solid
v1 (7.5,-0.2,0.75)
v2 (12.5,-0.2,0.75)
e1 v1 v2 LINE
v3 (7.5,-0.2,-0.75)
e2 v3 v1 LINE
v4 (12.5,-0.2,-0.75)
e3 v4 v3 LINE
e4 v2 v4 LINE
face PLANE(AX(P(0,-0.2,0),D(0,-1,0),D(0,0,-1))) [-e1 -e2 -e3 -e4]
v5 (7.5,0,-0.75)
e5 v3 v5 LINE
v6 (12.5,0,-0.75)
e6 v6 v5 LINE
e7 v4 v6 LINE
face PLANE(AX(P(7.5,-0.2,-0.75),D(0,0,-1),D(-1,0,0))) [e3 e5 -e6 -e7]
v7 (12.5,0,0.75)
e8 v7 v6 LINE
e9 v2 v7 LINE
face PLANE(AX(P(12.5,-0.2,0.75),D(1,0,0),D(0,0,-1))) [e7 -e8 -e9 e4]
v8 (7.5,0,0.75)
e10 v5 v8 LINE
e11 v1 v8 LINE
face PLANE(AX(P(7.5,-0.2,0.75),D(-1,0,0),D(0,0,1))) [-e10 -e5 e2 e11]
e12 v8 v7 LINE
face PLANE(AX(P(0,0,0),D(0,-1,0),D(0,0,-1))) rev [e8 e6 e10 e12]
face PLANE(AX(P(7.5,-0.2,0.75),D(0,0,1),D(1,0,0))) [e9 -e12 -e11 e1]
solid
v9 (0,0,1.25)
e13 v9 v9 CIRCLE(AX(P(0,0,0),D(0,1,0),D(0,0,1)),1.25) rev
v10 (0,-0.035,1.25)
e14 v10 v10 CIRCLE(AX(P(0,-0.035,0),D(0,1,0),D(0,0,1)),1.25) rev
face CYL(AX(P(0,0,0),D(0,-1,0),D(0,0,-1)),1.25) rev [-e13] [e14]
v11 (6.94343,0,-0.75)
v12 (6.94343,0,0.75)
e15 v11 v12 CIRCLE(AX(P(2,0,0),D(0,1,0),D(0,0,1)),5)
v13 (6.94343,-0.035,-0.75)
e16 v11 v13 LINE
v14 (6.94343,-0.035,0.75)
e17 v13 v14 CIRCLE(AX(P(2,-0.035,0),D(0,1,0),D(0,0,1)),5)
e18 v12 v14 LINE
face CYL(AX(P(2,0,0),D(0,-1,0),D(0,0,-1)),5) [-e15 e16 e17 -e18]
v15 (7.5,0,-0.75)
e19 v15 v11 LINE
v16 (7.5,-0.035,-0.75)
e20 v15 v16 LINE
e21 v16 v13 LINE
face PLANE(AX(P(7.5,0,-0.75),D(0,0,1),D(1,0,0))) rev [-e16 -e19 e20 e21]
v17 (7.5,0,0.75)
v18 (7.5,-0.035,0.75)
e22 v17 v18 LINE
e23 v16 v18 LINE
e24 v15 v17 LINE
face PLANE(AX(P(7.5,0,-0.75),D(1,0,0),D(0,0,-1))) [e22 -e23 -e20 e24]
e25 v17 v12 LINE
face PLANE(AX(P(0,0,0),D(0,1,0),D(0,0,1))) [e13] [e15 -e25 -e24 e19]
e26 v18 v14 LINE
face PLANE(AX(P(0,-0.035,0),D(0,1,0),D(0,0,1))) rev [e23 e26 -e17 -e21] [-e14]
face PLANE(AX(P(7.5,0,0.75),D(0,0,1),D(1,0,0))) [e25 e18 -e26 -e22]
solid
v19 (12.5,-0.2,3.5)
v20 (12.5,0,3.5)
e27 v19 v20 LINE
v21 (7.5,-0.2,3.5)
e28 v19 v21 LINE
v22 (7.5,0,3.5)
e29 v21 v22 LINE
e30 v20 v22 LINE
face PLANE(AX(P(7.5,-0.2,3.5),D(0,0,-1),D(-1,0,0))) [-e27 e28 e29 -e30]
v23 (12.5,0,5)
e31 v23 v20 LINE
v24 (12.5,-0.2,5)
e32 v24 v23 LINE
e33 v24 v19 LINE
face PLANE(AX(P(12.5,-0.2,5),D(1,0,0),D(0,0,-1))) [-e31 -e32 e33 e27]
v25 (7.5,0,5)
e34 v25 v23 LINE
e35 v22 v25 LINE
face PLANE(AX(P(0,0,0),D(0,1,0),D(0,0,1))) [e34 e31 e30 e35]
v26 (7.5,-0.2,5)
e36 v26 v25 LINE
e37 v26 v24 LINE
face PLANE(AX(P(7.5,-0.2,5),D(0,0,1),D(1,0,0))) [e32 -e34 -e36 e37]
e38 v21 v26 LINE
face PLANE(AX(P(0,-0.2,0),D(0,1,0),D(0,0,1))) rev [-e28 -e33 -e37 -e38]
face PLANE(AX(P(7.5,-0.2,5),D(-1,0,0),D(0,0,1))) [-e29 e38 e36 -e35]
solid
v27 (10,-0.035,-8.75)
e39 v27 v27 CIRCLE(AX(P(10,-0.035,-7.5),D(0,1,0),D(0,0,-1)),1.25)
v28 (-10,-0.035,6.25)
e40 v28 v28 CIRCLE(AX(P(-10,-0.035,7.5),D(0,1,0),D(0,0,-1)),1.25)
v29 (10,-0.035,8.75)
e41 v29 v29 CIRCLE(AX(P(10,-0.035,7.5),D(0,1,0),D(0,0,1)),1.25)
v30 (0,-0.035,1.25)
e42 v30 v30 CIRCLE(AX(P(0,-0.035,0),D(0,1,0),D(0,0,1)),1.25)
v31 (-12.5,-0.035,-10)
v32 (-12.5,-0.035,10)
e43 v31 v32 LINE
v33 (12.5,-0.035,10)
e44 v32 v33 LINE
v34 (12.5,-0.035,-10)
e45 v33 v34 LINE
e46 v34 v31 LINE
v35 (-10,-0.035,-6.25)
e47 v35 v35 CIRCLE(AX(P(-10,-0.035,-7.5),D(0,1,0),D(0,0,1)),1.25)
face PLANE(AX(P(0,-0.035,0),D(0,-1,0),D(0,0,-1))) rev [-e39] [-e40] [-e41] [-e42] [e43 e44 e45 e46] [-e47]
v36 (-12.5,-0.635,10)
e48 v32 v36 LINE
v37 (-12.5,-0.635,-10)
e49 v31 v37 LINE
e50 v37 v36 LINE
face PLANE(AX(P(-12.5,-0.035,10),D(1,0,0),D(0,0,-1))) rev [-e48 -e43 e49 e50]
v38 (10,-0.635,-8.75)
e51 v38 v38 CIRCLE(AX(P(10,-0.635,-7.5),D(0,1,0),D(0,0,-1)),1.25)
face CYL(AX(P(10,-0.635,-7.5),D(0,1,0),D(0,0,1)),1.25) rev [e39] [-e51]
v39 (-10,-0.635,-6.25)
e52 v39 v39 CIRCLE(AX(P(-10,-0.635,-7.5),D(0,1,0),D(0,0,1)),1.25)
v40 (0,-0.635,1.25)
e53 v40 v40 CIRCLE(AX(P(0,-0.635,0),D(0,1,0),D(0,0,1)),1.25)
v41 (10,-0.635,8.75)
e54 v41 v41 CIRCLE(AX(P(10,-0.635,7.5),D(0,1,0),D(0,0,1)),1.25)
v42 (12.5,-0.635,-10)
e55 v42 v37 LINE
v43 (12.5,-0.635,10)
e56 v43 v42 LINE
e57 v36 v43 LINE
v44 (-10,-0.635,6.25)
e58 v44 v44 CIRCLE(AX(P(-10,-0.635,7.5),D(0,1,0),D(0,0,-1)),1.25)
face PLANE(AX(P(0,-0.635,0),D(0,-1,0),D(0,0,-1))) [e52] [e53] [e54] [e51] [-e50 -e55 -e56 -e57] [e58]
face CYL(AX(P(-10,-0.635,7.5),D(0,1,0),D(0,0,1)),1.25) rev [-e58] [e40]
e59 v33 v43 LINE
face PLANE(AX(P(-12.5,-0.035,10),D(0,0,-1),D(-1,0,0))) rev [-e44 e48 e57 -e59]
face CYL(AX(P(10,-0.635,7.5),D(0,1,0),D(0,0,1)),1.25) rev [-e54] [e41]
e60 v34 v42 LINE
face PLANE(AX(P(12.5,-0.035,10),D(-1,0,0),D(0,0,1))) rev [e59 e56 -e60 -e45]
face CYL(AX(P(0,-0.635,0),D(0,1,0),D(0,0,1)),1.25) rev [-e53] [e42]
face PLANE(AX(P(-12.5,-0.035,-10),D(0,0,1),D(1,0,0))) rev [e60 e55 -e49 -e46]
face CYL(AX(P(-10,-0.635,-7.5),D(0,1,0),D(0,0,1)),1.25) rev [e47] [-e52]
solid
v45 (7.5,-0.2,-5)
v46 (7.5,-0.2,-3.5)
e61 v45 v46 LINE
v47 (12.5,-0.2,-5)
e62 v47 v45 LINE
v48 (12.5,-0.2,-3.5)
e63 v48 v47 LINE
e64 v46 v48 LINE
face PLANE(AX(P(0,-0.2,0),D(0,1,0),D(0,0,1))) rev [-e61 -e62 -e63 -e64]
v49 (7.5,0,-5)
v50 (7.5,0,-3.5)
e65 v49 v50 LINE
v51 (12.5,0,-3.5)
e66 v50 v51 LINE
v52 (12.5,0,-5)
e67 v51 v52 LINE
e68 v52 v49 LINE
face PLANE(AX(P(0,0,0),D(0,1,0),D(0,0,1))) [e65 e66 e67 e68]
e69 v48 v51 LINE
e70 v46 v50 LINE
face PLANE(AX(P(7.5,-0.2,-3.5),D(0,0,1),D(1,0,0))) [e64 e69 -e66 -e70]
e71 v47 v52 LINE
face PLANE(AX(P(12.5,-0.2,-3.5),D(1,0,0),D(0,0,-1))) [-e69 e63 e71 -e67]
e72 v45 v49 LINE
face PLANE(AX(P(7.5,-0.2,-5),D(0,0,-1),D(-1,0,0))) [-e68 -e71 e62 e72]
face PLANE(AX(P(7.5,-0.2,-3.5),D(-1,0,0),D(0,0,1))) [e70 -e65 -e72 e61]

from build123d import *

# Parameters (mm, degrees)
BOSS_EXTRUDE1_START   = -0.635
SKETCH1_W             = 25
SKETCH1_H             = 20
BOSS_EXTRUDE1_DEPTH   = 0.6
SKETCH2_R             = 1.25
CUT_EXTRUDE1_DEPTH    = 0.6
BOSS_EXTRUDE2_START   = 0.035
SKETCH9_W             = 5
SKETCH9_H             = 1.5
BOSS_EXTRUDE2_DEPTH   = 0.2
BOSS_EXTRUDE2_2_DEPTH = 0.2
BOSS_EXTRUDE2_3_DEPTH = 0.2
SKETCH8_R             = 1.25
BOSS_EXTRUDE3_DEPTH   = 0.035


with BuildPart() as part:
    # Sketch1 → Boss-Extrude1 (new body)
    with BuildSketch(Plane(origin=(0, 0, 0), x_dir=(1, 0, 0), z_dir=(0, 1, 0)).offset(BOSS_EXTRUDE1_START)):
        Rectangle(SKETCH1_W, SKETCH1_H)
    extrude(amount=BOSS_EXTRUDE1_DEPTH)

    # Sketch2 → Cut-Extrude1 (cut)
    with BuildSketch(Plane(origin=(0, -0.035, 0), x_dir=(1, 0, 0), z_dir=(0, 1, 0))):
        with Locations((-10, 7.5)):
            Circle(SKETCH2_R)
        with Locations((10, 7.5)):
            Circle(SKETCH2_R)
        with Locations((10, -7.5)):
            Circle(SKETCH2_R)
        with Locations((-10, -7.5)):
            Circle(SKETCH2_R)
        Circle(SKETCH2_R)
    extrude(amount=-CUT_EXTRUDE1_DEPTH, mode=Mode.SUBTRACT)


with BuildPart() as body_2:
    # Sketch9 → Boss-Extrude2 (new body)
    with BuildSketch(Plane(origin=(0, -0.035, 0), x_dir=(1, 0, 0), z_dir=(0, 1, 0)).offset(BOSS_EXTRUDE2_START)):
        with Locations((10, 4.25)):
            Rectangle(SKETCH9_W, SKETCH9_H)
    extrude(amount=-BOSS_EXTRUDE2_DEPTH)


with BuildPart() as body_3:
    # Sketch9 → Boss-Extrude2 2 (new body)
    with BuildSketch(Plane(origin=(0, -0.035, 0), x_dir=(1, 0, 0), z_dir=(0, 1, 0)).offset(BOSS_EXTRUDE2_START)):
        with Locations((10, 0)):
            Rectangle(SKETCH9_W, SKETCH9_H)
    extrude(amount=-BOSS_EXTRUDE2_2_DEPTH)


with BuildPart() as body_4:
    # Sketch9 → Boss-Extrude2 3 (new body)
    with BuildSketch(Plane(origin=(0, -0.035, 0), x_dir=(1, 0, 0), z_dir=(0, 1, 0)).offset(BOSS_EXTRUDE2_START)):
        with Locations((10, -4.25)):
            Rectangle(SKETCH9_W, SKETCH9_H)
    extrude(amount=-BOSS_EXTRUDE2_3_DEPTH)


with BuildPart() as body_5:
    # Sketch8 → Boss-Extrude3 (new body)
    with BuildSketch(Plane(origin=(0, -0.035, 0), x_dir=(1, 0, 0), z_dir=(0, 1, 0))):
        with BuildLine():
            Line((7.5, 0.75), (6.943429983, 0.75))
            ThreePointArc((6.943429983, 0.75), (-3, 0), (6.943429983, -0.75))
            Line((6.943429983, -0.75), (7.5, -0.75))
            Line((7.5, -0.75), (7.5, 0.75))
        make_face()
        Circle(SKETCH8_R, mode=Mode.SUBTRACT)
    extrude(amount=BOSS_EXTRUDE3_DEPTH)


solid = Compound([part.part, body_2.part, body_3.part, body_4.part, body_5.part])
